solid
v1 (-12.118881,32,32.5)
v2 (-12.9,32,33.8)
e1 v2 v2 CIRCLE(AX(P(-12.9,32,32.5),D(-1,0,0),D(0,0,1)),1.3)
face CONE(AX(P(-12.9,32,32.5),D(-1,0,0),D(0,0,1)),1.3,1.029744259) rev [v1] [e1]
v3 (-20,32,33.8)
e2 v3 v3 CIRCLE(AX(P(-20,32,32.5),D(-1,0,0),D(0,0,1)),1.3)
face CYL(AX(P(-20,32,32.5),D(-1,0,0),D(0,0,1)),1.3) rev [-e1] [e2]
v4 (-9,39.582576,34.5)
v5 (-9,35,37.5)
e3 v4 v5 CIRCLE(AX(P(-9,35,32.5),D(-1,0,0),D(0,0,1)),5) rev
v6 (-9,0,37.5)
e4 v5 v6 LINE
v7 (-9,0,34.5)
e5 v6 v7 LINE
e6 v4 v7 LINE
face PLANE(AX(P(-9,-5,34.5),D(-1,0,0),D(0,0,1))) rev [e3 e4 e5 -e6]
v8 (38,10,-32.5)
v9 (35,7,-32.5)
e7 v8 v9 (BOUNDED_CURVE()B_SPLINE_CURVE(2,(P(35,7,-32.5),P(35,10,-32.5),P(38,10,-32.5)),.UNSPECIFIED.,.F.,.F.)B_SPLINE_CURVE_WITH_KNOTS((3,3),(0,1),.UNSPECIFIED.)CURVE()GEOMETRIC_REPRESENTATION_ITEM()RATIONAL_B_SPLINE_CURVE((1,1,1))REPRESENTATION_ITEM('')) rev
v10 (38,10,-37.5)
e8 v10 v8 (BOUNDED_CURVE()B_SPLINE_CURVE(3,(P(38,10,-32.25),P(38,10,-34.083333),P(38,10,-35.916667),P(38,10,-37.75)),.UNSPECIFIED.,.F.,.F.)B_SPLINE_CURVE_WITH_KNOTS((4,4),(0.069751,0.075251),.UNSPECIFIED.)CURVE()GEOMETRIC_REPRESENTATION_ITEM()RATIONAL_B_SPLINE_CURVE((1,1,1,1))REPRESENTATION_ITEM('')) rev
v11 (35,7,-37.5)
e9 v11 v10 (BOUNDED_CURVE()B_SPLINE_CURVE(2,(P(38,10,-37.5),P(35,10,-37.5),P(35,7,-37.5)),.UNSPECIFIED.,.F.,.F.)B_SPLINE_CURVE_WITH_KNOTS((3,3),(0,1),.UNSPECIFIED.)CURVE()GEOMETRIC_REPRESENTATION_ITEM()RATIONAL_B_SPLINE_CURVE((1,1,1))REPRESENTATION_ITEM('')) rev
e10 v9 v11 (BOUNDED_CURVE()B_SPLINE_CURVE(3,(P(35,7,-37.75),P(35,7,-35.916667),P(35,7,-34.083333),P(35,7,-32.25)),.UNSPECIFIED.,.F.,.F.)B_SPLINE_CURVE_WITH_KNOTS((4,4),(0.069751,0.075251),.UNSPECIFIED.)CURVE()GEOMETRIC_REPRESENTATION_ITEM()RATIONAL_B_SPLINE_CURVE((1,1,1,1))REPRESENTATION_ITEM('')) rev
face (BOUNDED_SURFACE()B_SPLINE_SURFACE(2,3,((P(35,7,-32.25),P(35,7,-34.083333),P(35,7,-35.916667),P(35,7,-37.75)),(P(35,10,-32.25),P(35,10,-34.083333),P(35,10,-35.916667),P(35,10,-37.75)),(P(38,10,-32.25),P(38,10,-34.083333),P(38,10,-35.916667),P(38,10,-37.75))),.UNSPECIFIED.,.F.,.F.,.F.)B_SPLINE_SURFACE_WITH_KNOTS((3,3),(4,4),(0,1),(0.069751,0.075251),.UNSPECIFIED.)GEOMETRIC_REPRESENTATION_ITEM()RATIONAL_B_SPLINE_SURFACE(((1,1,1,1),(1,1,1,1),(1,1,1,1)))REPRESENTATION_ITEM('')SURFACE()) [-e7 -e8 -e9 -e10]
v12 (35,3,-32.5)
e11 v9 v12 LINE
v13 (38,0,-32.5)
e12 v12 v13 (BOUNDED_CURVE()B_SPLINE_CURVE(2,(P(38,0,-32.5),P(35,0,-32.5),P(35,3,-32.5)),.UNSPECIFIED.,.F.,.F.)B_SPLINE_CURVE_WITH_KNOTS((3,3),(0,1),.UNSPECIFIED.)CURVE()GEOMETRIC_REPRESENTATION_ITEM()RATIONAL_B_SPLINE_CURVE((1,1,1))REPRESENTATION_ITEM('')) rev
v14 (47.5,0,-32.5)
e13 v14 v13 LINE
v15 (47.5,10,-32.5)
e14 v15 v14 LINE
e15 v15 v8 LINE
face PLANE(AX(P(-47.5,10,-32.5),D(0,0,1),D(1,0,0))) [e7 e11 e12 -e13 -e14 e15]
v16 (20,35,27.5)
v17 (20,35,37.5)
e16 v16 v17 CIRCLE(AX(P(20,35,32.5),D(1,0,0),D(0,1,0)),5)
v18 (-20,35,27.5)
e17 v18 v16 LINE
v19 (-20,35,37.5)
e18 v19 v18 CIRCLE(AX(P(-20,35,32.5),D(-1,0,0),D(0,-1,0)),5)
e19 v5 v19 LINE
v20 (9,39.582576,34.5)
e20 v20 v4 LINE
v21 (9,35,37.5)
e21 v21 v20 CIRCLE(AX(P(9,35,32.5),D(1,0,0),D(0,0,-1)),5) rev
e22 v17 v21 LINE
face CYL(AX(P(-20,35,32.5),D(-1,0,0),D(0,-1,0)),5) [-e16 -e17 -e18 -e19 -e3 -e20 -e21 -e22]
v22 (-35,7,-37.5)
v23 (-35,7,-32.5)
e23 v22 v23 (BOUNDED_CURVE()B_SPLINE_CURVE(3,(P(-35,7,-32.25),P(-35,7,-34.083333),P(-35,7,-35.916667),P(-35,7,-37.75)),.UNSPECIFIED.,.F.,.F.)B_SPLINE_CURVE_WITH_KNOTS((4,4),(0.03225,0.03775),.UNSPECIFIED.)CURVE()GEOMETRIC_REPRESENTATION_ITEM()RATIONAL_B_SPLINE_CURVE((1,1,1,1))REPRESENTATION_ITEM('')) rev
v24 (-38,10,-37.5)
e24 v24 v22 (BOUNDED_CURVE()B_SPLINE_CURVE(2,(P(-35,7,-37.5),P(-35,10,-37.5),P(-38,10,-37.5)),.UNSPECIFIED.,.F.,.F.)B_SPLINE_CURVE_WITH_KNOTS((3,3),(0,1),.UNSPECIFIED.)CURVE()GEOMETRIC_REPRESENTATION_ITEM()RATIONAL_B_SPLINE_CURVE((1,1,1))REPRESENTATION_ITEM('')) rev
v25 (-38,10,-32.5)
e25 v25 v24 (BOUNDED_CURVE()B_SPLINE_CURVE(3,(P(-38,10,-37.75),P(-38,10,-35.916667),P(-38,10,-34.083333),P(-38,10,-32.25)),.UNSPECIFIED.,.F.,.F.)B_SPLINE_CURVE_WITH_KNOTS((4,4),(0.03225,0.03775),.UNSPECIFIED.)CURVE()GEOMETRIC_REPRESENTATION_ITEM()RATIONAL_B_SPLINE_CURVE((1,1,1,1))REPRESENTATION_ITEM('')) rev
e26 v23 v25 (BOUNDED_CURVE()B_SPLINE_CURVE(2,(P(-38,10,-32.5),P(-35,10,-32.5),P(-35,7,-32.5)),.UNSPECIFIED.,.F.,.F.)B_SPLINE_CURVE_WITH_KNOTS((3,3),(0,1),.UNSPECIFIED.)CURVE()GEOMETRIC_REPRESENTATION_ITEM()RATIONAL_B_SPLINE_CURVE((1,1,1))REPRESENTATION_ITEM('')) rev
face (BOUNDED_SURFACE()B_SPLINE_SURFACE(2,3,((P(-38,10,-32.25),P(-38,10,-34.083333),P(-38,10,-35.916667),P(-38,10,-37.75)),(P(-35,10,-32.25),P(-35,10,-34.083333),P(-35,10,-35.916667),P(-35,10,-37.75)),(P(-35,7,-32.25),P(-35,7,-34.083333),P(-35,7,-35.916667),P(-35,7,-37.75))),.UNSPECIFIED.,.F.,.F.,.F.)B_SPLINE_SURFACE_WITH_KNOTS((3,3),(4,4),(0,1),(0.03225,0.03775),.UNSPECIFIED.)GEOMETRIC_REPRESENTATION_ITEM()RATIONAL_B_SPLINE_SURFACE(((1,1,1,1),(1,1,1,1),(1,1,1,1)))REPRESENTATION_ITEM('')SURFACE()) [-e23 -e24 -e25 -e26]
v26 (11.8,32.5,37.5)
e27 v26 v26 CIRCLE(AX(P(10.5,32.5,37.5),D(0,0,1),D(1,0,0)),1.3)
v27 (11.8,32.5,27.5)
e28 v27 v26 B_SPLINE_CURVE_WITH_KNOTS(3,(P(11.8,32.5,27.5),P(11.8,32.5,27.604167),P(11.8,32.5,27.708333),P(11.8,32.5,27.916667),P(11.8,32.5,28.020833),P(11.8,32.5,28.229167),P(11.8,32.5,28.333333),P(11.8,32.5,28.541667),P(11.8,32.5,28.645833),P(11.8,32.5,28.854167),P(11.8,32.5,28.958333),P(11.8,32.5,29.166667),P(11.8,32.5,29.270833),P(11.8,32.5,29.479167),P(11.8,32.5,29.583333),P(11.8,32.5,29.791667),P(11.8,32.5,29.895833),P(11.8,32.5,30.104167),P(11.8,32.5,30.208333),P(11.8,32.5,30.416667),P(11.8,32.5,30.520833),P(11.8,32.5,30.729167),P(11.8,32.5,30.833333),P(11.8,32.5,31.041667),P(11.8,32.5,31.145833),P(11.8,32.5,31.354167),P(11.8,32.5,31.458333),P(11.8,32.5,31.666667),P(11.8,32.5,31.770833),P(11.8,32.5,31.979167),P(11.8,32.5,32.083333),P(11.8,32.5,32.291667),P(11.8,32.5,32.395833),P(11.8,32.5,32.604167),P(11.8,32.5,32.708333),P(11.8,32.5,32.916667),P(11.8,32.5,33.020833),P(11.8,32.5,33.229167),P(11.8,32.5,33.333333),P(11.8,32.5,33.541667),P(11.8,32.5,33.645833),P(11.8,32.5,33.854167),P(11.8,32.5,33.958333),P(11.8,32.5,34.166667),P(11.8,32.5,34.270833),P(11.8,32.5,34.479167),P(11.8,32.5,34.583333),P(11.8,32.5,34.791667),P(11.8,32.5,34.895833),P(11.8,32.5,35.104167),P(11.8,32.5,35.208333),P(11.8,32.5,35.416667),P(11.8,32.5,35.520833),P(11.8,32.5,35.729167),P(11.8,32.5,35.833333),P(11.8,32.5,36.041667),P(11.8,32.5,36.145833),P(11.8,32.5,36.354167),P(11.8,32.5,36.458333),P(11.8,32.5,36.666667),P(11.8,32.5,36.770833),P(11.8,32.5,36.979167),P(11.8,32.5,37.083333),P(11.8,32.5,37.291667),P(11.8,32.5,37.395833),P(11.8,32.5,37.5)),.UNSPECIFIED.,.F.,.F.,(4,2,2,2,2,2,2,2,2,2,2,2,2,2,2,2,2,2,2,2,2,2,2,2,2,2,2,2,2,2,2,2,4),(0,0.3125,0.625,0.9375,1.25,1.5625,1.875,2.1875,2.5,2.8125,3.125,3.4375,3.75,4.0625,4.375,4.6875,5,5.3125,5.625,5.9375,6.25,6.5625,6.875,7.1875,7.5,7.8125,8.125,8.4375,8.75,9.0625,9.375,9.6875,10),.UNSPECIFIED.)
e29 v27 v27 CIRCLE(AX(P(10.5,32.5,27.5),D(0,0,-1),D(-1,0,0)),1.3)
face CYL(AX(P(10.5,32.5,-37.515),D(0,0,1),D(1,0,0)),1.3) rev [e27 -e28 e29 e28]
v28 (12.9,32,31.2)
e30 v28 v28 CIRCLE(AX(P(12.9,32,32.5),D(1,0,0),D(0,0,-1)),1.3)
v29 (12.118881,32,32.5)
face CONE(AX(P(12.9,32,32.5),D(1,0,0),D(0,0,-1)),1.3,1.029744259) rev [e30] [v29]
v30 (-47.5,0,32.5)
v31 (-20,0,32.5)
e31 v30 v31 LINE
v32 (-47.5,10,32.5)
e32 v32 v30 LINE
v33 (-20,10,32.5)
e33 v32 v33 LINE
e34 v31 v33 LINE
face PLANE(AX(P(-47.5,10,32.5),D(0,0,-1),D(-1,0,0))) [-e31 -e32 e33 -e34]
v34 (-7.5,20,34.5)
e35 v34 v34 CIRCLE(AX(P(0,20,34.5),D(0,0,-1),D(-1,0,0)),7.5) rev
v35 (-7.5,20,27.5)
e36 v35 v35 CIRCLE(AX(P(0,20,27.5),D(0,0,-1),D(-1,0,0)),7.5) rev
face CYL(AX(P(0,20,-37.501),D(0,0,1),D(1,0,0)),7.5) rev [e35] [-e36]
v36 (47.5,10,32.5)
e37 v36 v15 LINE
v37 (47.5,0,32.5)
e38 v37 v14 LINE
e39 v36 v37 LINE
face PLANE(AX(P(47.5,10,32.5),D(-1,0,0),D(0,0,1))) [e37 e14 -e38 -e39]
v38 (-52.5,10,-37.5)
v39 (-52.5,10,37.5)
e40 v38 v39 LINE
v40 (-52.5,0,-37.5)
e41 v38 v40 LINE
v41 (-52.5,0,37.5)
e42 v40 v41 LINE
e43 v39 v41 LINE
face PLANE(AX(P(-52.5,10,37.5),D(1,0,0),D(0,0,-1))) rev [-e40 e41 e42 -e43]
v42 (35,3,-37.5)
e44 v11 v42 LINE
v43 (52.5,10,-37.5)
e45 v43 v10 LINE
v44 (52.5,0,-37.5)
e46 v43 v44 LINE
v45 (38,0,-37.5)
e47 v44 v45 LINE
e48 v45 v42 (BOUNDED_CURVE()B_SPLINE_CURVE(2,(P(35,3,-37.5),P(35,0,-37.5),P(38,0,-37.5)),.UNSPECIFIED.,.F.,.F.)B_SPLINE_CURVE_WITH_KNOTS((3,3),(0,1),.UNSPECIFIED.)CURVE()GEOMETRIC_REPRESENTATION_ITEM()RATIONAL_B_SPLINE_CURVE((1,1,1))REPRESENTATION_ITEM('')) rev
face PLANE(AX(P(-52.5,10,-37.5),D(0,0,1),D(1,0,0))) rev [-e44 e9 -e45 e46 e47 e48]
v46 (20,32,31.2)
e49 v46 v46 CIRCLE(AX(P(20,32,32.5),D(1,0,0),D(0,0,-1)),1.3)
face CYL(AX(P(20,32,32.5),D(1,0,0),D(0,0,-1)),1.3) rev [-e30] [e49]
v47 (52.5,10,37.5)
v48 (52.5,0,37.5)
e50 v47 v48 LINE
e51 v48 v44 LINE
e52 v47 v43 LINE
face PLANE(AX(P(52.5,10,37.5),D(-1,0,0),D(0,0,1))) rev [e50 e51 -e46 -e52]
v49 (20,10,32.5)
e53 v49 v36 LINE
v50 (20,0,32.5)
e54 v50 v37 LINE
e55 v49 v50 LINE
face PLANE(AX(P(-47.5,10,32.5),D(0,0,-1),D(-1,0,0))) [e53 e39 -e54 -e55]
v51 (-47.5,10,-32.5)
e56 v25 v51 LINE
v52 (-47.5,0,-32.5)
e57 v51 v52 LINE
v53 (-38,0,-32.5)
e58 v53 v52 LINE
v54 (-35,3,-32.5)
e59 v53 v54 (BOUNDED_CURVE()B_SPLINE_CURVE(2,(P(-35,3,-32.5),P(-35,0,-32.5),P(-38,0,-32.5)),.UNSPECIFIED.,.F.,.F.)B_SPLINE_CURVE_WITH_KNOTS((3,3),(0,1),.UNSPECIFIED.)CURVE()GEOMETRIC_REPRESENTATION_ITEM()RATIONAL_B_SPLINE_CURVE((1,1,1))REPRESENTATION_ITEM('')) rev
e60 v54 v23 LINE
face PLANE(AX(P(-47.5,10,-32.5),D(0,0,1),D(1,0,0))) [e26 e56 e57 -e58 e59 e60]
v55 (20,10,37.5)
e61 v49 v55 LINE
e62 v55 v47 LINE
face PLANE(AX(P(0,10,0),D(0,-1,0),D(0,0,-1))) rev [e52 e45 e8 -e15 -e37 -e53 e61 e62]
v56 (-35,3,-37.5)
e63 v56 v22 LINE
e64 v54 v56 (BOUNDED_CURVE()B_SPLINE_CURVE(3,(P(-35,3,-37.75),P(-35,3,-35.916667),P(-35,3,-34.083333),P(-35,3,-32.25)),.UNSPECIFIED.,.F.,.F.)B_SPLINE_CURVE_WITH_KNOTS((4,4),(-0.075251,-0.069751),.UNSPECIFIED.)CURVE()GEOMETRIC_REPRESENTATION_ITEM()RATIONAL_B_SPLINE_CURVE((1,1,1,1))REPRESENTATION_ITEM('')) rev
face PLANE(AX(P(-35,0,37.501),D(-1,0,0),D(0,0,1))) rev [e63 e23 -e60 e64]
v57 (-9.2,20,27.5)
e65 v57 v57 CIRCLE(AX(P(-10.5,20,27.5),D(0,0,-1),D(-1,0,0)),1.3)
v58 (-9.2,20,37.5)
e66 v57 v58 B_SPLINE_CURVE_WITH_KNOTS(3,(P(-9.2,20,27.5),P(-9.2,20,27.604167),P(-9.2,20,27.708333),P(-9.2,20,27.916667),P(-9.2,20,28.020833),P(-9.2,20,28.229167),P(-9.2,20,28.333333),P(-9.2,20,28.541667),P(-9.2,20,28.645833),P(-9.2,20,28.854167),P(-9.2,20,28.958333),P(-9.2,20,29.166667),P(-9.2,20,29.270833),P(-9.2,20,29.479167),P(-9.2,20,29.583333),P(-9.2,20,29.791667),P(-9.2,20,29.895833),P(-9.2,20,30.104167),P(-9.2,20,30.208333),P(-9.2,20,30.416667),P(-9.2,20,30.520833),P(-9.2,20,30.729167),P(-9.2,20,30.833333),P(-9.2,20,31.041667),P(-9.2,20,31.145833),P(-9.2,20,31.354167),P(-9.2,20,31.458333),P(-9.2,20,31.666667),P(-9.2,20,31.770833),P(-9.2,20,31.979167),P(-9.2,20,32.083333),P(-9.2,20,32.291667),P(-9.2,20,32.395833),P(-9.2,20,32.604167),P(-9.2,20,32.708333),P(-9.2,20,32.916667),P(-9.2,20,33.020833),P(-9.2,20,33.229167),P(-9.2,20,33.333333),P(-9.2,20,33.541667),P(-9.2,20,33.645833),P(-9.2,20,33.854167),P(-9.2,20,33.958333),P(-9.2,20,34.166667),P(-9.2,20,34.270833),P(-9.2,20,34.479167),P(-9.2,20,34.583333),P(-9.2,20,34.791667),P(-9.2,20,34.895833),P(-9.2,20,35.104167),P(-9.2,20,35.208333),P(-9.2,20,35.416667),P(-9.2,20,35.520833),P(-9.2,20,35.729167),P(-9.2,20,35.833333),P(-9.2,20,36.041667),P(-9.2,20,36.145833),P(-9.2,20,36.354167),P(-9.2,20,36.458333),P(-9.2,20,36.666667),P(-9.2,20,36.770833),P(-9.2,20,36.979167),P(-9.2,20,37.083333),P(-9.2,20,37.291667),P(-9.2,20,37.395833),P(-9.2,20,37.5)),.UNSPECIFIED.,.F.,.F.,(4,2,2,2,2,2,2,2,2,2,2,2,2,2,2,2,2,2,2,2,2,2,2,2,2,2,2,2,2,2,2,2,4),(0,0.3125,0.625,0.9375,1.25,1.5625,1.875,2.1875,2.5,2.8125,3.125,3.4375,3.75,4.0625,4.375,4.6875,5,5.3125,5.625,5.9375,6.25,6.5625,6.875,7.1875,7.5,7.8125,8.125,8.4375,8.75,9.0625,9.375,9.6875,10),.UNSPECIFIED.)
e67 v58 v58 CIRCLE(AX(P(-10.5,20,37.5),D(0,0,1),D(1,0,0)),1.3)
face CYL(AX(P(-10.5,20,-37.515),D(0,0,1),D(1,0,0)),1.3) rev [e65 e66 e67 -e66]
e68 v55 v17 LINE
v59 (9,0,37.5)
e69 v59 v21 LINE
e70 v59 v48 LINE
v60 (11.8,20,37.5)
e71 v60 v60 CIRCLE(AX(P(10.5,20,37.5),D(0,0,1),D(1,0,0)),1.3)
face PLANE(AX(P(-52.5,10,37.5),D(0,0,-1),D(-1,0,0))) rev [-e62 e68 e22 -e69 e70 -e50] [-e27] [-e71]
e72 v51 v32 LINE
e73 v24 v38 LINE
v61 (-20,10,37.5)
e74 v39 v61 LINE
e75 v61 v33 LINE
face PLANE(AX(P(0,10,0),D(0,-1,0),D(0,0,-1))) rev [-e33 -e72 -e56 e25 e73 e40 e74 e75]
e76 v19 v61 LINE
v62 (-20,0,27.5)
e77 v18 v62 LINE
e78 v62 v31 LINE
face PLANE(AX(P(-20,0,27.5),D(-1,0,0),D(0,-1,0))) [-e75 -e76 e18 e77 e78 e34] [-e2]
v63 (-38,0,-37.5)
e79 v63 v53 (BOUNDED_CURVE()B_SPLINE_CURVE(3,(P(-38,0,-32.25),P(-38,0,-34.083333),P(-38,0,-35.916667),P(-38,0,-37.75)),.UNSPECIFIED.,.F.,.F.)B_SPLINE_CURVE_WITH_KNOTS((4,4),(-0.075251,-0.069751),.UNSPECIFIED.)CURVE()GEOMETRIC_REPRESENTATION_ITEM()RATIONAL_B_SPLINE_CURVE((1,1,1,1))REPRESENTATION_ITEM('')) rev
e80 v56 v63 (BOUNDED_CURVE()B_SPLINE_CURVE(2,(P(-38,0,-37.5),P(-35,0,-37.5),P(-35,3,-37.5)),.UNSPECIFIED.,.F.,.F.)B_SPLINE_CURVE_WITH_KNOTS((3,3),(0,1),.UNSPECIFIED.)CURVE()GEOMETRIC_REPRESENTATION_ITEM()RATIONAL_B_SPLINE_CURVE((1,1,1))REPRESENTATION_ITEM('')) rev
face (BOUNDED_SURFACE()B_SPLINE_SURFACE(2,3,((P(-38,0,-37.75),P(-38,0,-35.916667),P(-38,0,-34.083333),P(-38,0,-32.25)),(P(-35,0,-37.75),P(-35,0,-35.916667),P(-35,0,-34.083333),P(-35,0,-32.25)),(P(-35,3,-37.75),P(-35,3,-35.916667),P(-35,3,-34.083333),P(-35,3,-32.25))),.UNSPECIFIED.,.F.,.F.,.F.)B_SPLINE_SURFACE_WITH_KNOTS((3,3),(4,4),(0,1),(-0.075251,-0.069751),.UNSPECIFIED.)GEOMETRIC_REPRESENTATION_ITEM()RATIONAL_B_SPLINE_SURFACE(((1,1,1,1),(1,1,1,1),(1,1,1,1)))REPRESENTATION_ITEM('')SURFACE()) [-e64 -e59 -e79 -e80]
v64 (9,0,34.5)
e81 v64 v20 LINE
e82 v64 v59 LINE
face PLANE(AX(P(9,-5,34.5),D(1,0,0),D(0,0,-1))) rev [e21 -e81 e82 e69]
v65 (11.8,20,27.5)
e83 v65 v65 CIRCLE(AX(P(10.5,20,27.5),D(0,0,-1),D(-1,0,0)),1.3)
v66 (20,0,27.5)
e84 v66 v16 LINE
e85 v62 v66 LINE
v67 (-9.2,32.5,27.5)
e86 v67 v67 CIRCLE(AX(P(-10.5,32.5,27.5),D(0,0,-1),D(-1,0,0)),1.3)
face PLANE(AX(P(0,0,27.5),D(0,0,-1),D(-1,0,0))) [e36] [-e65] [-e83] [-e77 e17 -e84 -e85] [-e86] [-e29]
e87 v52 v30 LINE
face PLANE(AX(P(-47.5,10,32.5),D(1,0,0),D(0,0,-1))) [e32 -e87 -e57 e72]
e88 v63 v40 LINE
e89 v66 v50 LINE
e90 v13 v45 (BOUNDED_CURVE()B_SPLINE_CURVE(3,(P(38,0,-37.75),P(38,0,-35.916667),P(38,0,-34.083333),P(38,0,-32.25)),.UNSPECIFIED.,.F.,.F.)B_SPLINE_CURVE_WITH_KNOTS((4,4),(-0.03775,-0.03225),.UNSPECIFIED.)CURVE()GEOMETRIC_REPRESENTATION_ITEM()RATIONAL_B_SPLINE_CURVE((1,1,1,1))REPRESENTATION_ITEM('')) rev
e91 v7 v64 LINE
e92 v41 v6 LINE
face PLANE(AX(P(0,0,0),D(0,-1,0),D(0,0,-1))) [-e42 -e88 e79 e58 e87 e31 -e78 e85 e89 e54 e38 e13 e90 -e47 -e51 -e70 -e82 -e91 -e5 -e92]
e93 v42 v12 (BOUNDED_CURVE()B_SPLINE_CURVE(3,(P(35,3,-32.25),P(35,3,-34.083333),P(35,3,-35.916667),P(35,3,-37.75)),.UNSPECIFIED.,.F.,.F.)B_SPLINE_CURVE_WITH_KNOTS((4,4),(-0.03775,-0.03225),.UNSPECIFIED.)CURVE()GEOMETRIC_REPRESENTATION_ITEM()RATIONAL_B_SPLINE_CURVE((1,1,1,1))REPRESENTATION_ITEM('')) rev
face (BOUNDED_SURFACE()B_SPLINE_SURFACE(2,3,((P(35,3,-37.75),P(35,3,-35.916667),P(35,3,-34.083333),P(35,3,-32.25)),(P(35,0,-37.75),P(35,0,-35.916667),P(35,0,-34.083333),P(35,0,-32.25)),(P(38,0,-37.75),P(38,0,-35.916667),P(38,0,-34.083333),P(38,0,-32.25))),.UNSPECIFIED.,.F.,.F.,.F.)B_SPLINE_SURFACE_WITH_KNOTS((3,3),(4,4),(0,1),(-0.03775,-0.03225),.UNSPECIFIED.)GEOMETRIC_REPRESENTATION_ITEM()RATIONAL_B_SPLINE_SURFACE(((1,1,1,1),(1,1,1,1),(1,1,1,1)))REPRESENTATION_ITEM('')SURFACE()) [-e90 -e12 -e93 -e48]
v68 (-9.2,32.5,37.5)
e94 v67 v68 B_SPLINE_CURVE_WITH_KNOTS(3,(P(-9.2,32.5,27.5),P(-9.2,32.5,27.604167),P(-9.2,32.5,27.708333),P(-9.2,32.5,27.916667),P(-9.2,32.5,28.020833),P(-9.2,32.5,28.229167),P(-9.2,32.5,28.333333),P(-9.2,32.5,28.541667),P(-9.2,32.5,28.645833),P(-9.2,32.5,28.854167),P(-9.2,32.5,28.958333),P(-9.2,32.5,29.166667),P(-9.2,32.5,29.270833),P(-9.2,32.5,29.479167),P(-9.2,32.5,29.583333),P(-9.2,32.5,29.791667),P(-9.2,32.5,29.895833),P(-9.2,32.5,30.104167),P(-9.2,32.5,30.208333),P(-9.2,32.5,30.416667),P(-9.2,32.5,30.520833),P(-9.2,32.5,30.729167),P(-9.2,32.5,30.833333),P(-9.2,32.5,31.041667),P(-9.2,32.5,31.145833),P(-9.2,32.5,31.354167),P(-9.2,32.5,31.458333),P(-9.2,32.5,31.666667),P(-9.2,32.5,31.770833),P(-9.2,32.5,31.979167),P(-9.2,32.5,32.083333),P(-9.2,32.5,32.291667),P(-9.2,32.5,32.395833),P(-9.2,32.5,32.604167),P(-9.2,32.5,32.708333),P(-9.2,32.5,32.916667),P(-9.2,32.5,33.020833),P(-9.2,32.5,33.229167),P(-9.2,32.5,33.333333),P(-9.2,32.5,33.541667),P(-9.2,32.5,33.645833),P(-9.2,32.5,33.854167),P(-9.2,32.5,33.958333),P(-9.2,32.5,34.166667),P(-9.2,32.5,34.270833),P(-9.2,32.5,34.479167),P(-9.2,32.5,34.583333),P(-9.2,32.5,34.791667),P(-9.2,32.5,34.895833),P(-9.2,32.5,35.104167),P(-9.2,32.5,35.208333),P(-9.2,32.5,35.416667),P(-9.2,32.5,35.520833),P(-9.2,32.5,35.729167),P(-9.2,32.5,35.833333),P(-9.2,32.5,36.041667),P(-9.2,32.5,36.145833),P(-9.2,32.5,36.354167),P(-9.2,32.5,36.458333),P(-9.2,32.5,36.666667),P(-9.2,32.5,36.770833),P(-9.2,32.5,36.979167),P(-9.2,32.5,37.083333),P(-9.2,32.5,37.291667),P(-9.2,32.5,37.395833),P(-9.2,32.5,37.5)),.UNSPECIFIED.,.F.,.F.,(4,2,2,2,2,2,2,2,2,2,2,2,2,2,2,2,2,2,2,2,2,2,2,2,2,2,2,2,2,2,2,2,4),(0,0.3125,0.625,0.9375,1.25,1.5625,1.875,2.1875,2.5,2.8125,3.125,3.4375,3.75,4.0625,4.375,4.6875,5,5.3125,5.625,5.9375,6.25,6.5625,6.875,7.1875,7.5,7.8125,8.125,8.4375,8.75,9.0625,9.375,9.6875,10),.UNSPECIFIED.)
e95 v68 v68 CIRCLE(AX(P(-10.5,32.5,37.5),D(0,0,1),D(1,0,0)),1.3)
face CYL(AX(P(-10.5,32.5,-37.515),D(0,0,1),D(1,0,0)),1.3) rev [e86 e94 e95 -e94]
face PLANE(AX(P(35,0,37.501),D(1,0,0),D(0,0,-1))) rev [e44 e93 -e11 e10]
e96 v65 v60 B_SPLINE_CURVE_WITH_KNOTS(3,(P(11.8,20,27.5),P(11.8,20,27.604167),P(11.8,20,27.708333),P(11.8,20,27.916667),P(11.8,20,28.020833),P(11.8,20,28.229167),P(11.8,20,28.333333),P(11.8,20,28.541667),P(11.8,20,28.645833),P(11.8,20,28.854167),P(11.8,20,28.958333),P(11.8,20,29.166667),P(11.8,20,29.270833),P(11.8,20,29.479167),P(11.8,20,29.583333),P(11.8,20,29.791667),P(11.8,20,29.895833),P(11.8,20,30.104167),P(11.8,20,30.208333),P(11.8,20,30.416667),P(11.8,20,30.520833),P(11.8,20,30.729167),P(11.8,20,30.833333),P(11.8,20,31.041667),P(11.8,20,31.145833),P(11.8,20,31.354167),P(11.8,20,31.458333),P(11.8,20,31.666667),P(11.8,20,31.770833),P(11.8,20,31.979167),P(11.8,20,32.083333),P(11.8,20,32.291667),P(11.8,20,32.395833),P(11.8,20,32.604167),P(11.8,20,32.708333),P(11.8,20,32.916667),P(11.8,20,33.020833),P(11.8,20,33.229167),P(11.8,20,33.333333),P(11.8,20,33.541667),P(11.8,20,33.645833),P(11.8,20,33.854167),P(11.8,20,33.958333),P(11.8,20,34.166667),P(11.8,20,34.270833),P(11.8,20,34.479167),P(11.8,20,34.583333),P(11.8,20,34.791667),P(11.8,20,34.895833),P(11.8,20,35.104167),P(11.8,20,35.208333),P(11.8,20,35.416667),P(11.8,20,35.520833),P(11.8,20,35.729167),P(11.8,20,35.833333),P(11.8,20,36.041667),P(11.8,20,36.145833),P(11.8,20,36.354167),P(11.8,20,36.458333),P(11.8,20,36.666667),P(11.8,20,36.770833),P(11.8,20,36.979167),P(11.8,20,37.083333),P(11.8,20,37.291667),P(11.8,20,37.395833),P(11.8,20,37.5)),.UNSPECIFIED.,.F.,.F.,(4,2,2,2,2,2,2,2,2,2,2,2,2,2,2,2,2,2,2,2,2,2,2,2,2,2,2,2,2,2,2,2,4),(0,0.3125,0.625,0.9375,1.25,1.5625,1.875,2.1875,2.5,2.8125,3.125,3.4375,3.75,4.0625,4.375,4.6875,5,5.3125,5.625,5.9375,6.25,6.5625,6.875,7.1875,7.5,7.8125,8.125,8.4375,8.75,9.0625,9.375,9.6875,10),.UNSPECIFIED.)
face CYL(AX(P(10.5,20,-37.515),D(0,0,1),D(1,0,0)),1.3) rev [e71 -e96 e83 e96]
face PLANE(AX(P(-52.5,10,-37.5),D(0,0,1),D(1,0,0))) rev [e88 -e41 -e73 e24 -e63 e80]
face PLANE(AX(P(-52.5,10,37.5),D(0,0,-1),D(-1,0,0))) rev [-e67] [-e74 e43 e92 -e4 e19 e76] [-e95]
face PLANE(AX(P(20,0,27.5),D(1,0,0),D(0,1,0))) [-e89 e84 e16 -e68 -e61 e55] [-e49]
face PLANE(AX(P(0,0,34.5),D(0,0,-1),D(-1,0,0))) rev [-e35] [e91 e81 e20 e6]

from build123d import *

# Parameters (mm, degrees)
SKETCH_1_W          = 105
SKETCH_1_H          = 75
SKETCH_1_W_2        = 95
SKETCH_1_H_2        = 65
EXTRUDE_1_DEPTH     = 10
SKETCH_2_W          = 40
SKETCH_2_H          = 40
EXTRUDE_2_DEPTH     = 10
CUT_EXTRUDE_1_REACH = 101.906
SKETCH_3_R          = 7.5
CUT_EXTRUDE_2_REACH = 101.906
SKETCH_4_W          = 70
SKETCH_4_H          = 10
FILLET_2_RADIUS     = 5
FILLET_2_LENGTH     = 40
FILLET_3_SIZE       = 3
SKETCH_8_R          = 1.3
CUT_EXTRUDE_3_DEPTH = 100.906206141
SKETCH_9_W          = 18
SKETCH_9_H          = 50
CUT_EXTRUDE_4_DEPTH = 3


with BuildPart() as part:
    # 草圖1 → 填料-伸長1 (new body)
    with BuildSketch(Plane(origin=(0, 0, 0), x_dir=(1, 0, 0), z_dir=(0, 1, 0))):
        Rectangle(SKETCH_1_W, SKETCH_1_H)
        Rectangle(SKETCH_1_W_2, SKETCH_1_H_2, mode=Mode.SUBTRACT)
    extrude(amount=EXTRUDE_1_DEPTH)

    # 草圖2 → 填料-伸長2 (add)
    with BuildSketch(Plane.XY.offset(37.5)):
        with Locations((0, 20)):
            Rectangle(SKETCH_2_W, SKETCH_2_H)
    extrude(amount=-EXTRUDE_2_DEPTH)

    # 草圖3 → 除料-伸長1 (cut, up to next)
    with BuildSketch(Plane.XY.offset(37.5), mode=Mode.PRIVATE) as cut_extrude_1_sk1:
        with Locations((0, 20)):
            Circle(SKETCH_3_R)
    cut_extrude_1_tool1 = extrude(cut_extrude_1_sk1.sketch, amount=-CUT_EXTRUDE_1_REACH, mode=Mode.PRIVATE) & part.part
    add(cut_extrude_1_tool1.solids().sort_by_distance((0, 20, 37.5))[0], mode=Mode.SUBTRACT)

    # 草圖4 → 除料-伸長2 (cut, up to next)
    with BuildSketch(Plane(origin=(0, 0, -37.5), x_dir=(-1, 0, 0), z_dir=(0, 0, -1)), mode=Mode.PRIVATE) as cut_extrude_2_sk1:
        with Locations((0, 5)):
            Rectangle(SKETCH_4_W, SKETCH_4_H)
    cut_extrude_2_tool1 = extrude(cut_extrude_2_sk1.sketch, amount=-CUT_EXTRUDE_2_REACH, mode=Mode.PRIVATE) & part.part
    add(cut_extrude_2_tool1.solids().sort_by_distance((0, 5, -37.5))[0], mode=Mode.SUBTRACT)

    # 草圖7 → Ø1.0 (1) 直徑孔1 (revolve, cut)
    with BuildSketch(Plane(origin=(20, 32, 32.5), x_dir=(0, 0, -1), z_dir=(0, 1, 0))):
        Polygon((0, 0), (0, 7.881118805), (1.3, 7.1), (1.3, 0), align=None)
    hole_wizard_1_0_1_1 = revolve(axis=Axis((26.35, 32, 32.5), (-1, 0, 0)), mode=Mode.SUBTRACT)

    # 鏡射1: Ø1.0 (1) 直徑孔1 across plane
    add(hole_wizard_1_0_1_1.mirror(Plane(origin=(0, 0, 0), x_dir=(0, 0, 1), z_dir=(1, 0, 0))), mode=Mode.SUBTRACT)

    # 圓角2: full round fillet: the end face becomes a half cylinder, R = half its width
    fillet_2_face = Plane((0, 40, 32.5), x_dir=(1, 0, 0), z_dir=(0, 1, 0))  # on the end face: x along it, z out of the body
    fillet_2_slab = fillet_2_face.offset(-FILLET_2_RADIUS / 2) * Box(FILLET_2_LENGTH, 2 * FILLET_2_RADIUS, FILLET_2_RADIUS, mode=Mode.PRIVATE)  # the body's end, R deep
    fillet_2_round = Plane((0, 35, 32.5), x_dir=(0, 1, 0), z_dir=(1, 0, 0)) * Cylinder(FILLET_2_RADIUS, FILLET_2_LENGTH, mode=Mode.PRIVATE)  # its axis R under the face
    add(fillet_2_slab - fillet_2_round, mode=Mode.SUBTRACT)

    # 圓角3
    # a fillet whose section is not a circle: 3 mm, written as the material it takes off along each edge
    with BuildSketch(Plane(origin=(35, 0, -45), x_dir=(0, 1, 0), z_dir=(0, 0, 1)), Plane(origin=(-35, 10, -45), x_dir=(0, -1, 0), z_dir=(0, 0, 1))) as fillet_3_piece_1:
        with BuildLine():
            Bezier((FILLET_3_SIZE, 0), (0, 0), (0, -FILLET_3_SIZE), weights=[1, 1, 1])
            Line((0, -FILLET_3_SIZE), (0, 0))
            Line((0, 0), (FILLET_3_SIZE, 0))
        make_face()
    extrude(amount=20, mode=Mode.SUBTRACT)
    with BuildSketch(Plane(origin=(35, 10, -45), x_dir=(0, -1, 0), z_dir=(0, 0, 1)), Plane(origin=(-35, 0, -45), x_dir=(0, 1, 0), z_dir=(0, 0, 1))) as fillet_3_piece_2:
        with BuildLine():
            Bezier((FILLET_3_SIZE, 0), (0, 0), (0, FILLET_3_SIZE), weights=[1, 1, 1])
            Line((0, FILLET_3_SIZE), (0, 0))
            Line((0, 0), (FILLET_3_SIZE, 0))
        make_face()
    extrude(amount=20, mode=Mode.SUBTRACT)

    # 草圖8 → 除料-伸長3 (cut, through all)
    with BuildSketch(Plane.XY.offset(37.5)):
        with Locations((-10.5, 32.5)):
            Circle(SKETCH_8_R)
        with Locations((-10.5, 20)):
            Circle(SKETCH_8_R)
        with Locations((10.5, 32.5)):
            Circle(SKETCH_8_R)
        with Locations((10.5, 20)):
            Circle(SKETCH_8_R)
    extrude(amount=-CUT_EXTRUDE_3_DEPTH, mode=Mode.SUBTRACT)

    # 草圖9 → 除料-伸長4 (cut)
    with BuildSketch(Plane.XY.offset(37.5)):
        with Locations((0, 20)):
            Rectangle(SKETCH_9_W, SKETCH_9_H)
    extrude(amount=-CUT_EXTRUDE_4_DEPTH, mode=Mode.SUBTRACT)


solid = part.part
